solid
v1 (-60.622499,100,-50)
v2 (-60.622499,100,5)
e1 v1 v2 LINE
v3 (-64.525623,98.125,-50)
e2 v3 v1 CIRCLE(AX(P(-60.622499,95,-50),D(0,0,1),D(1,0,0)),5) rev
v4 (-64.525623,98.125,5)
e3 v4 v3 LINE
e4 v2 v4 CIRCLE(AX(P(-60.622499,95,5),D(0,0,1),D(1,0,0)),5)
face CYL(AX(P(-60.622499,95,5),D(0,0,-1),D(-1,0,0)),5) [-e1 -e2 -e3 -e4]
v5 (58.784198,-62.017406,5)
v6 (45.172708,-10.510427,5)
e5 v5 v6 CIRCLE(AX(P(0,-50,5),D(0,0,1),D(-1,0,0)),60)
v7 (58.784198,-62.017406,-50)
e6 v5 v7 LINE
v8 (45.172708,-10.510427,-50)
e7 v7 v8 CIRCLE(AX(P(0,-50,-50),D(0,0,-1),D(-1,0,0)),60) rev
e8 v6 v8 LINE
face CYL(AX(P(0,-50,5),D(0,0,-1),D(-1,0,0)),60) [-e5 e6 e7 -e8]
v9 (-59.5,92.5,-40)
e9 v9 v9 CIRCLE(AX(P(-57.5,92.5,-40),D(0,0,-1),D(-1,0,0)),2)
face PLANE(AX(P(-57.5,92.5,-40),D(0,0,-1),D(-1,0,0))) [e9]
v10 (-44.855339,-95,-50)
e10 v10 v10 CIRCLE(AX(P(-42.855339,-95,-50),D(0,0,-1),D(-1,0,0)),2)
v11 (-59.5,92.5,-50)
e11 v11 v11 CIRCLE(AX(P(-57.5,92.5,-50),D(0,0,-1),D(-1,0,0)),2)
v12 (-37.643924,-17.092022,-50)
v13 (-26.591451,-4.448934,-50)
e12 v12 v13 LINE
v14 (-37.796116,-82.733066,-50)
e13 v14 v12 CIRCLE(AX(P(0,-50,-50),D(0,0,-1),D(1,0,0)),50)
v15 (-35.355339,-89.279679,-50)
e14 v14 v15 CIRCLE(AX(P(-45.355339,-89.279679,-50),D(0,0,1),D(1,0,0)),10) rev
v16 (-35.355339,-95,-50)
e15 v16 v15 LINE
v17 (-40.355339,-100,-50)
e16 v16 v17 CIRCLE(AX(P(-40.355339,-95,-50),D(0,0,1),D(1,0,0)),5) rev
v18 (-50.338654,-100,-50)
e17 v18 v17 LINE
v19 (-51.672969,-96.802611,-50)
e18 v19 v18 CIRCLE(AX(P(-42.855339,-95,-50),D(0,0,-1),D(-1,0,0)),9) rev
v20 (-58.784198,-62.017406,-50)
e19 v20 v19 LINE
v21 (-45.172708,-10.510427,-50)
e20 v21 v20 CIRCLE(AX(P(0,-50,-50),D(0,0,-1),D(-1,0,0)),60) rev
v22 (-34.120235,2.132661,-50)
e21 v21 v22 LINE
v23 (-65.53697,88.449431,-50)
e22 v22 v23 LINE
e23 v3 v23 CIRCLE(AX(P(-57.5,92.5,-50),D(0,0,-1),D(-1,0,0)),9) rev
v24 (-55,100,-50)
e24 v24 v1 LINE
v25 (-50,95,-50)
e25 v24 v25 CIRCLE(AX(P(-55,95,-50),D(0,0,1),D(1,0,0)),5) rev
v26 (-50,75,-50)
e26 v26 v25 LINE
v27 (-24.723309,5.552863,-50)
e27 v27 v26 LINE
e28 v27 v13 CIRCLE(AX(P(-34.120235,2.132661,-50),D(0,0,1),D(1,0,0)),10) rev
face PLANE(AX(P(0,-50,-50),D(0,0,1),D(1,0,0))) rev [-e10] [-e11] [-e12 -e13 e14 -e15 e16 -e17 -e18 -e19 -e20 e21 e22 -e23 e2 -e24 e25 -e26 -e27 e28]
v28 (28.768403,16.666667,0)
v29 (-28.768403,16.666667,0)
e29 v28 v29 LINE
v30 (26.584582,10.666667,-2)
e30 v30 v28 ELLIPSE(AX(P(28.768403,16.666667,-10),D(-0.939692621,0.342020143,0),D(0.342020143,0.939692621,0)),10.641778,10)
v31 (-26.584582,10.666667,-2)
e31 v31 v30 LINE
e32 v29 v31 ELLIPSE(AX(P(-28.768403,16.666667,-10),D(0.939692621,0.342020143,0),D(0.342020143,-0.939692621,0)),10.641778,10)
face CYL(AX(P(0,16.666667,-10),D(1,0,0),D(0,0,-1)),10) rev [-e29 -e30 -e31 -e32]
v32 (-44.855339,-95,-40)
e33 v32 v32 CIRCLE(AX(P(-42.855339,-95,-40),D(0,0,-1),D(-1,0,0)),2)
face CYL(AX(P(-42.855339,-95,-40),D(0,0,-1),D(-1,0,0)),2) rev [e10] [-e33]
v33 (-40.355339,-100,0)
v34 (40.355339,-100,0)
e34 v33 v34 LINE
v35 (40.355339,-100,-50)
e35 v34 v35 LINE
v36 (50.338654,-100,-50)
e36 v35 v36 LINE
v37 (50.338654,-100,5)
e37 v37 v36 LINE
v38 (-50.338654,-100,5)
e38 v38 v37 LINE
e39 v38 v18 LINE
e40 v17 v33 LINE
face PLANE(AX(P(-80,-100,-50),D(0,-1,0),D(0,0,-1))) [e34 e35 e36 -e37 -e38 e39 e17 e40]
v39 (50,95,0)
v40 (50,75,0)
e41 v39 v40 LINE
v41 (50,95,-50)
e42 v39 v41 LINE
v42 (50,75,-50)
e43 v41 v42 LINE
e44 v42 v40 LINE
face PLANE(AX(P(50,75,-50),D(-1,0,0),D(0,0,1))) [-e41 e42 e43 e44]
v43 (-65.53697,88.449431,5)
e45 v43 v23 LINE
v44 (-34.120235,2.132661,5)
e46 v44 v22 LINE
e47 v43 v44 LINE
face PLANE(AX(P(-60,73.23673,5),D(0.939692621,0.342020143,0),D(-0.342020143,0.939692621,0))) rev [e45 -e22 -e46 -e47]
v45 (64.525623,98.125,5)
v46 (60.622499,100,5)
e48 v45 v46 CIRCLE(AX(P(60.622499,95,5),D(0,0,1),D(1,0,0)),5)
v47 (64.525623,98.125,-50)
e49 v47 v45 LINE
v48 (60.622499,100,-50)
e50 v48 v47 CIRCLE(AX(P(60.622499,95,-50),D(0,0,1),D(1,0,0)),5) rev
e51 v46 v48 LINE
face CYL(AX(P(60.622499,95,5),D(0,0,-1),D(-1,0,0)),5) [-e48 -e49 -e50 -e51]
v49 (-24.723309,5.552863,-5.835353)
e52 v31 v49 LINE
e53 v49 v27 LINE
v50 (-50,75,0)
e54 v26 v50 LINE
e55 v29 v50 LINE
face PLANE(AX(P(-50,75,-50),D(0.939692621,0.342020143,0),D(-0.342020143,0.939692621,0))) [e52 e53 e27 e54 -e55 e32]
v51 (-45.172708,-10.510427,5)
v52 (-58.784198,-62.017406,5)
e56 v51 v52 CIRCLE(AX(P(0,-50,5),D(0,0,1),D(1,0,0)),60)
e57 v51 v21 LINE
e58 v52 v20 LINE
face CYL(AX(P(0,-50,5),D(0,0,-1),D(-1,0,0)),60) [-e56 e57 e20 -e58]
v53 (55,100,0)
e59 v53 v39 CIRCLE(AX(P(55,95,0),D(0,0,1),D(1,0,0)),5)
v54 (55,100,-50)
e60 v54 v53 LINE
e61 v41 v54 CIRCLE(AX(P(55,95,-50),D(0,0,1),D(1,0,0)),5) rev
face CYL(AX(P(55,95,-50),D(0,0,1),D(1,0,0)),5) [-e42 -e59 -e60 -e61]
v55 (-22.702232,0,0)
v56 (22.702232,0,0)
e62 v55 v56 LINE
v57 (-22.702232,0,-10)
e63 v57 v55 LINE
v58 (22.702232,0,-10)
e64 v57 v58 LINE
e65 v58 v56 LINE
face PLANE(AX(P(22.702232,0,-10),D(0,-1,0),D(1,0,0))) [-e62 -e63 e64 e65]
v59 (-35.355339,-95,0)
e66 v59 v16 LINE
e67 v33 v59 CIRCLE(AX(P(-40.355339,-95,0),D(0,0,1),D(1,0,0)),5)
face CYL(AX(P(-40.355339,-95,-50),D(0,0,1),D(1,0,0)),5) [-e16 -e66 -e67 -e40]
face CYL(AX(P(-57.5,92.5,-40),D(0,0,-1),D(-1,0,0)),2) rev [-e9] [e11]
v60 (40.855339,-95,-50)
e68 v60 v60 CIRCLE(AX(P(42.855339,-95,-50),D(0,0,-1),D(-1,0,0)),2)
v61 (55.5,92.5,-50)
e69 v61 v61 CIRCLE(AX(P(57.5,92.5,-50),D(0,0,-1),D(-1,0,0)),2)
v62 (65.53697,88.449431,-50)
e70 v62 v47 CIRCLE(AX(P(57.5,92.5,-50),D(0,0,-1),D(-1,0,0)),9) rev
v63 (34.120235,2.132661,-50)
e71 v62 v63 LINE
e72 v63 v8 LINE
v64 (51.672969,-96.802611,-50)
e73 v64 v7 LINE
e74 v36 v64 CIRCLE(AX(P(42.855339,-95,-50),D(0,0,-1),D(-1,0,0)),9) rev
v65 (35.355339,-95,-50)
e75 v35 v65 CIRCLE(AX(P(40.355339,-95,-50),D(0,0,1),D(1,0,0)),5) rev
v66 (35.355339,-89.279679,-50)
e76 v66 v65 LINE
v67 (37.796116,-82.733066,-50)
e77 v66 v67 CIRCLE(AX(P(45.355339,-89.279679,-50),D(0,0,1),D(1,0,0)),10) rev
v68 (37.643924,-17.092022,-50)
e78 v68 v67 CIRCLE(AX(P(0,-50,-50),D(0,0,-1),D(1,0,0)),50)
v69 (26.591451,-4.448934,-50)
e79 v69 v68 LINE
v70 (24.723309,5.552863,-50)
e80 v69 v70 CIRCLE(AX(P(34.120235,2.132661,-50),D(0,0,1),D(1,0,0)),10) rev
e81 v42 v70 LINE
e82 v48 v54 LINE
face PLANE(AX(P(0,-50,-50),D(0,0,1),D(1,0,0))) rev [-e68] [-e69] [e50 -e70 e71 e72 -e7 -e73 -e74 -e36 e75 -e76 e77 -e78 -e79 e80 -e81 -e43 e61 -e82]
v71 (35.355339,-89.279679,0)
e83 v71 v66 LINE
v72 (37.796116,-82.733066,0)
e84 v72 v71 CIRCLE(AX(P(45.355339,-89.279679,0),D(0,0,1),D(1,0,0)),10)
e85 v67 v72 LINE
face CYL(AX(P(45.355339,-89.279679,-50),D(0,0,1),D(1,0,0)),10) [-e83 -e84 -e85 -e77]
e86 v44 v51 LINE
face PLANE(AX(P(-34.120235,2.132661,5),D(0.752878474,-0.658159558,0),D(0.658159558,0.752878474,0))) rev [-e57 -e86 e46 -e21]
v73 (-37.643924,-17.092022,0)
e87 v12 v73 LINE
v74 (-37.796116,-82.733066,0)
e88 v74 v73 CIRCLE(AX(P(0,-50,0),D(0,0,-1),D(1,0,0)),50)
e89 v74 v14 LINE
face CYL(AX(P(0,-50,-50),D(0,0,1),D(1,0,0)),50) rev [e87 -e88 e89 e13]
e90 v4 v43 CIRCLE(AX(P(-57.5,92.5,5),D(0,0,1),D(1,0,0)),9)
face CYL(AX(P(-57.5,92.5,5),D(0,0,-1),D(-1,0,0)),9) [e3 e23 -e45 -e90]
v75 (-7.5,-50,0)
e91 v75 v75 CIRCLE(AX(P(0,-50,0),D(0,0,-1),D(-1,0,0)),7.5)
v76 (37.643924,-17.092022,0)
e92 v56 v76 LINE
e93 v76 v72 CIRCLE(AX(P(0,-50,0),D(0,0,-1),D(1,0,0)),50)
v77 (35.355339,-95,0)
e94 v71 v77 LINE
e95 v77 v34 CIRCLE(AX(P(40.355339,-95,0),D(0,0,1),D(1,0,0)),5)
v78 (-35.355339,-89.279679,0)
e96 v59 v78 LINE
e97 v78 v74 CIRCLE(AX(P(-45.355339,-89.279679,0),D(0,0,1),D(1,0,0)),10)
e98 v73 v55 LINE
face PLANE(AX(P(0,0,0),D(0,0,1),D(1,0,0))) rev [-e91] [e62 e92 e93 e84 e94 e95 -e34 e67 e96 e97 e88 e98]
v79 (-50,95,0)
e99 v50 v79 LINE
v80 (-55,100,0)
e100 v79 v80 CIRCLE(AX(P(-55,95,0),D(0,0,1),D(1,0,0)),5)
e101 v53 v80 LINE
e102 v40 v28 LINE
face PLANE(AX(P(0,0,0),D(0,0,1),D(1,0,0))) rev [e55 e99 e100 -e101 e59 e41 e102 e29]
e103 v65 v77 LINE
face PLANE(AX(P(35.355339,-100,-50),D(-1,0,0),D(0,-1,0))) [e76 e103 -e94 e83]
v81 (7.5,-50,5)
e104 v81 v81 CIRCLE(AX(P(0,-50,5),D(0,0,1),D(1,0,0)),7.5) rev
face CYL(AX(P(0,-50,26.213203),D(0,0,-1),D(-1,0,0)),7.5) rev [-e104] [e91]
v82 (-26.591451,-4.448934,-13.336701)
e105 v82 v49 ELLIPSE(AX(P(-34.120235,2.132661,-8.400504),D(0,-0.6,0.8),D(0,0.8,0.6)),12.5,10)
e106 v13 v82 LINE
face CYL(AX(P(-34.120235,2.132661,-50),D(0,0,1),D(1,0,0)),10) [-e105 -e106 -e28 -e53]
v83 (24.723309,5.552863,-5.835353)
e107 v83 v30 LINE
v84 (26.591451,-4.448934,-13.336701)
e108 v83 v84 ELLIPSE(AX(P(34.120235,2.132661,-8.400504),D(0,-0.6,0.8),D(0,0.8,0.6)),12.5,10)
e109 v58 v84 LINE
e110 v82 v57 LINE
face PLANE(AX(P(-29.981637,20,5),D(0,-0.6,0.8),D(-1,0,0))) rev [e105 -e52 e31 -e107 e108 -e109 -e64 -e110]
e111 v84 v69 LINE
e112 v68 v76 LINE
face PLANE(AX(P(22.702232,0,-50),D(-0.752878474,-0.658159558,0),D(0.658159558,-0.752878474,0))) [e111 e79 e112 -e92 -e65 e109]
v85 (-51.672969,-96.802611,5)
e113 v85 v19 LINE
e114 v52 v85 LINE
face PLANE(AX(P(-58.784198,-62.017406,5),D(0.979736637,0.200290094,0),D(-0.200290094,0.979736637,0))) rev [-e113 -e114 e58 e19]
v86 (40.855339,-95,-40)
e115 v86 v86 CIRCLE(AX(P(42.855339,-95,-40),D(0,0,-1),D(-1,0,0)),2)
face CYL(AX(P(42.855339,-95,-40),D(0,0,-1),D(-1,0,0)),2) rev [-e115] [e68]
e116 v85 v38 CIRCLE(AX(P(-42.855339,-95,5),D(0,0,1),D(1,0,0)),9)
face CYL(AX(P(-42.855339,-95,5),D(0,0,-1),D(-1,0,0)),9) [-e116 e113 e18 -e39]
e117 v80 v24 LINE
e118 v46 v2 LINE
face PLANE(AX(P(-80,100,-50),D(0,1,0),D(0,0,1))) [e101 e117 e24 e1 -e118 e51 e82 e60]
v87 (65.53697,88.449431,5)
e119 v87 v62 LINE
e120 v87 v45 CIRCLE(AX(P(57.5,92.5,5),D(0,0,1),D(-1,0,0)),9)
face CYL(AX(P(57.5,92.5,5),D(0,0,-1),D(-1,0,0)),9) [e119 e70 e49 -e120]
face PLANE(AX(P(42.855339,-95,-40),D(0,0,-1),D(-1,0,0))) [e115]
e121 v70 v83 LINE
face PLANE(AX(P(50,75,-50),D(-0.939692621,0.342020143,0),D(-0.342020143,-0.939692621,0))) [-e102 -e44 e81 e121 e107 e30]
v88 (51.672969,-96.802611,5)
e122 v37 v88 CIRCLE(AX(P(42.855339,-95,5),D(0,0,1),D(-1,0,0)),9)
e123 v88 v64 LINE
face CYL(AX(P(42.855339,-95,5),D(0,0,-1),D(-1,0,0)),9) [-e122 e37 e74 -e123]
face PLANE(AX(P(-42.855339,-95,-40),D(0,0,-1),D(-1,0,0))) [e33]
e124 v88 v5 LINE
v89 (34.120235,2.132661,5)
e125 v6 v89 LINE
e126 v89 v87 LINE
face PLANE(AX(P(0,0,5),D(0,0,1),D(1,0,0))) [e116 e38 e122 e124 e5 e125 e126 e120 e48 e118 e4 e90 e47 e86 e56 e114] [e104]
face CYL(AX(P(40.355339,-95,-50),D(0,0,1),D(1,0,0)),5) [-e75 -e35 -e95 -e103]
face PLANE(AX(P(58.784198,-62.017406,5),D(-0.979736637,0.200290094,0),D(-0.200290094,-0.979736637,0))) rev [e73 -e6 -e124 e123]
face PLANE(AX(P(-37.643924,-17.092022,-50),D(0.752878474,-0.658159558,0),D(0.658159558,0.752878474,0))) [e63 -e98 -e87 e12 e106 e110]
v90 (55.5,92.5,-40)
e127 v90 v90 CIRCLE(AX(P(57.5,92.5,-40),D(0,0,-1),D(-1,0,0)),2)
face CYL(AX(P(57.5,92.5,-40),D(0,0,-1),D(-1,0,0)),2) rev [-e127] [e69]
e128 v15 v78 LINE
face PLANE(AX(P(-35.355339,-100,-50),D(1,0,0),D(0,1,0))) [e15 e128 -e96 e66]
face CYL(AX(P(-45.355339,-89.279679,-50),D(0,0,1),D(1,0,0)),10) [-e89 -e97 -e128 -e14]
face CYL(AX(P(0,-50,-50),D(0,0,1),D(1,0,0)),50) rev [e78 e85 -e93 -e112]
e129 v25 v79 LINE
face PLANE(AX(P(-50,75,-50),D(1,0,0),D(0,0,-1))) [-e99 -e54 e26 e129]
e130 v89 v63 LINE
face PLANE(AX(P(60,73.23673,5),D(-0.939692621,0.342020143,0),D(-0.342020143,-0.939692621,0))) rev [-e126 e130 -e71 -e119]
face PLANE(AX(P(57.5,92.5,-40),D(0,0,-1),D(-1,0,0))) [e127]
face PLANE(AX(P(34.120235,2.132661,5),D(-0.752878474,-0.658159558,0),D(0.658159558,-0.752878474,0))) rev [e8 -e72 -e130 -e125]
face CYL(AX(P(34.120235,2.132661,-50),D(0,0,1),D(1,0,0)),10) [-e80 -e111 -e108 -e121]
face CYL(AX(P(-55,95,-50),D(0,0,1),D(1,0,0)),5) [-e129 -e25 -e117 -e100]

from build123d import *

# Parameters (mm, degrees)
BOSS_EXTRUDE1_DEPTH     = 50
BOSS_EXTRUDE1_2_DEPTH   = 50
BOSS_EXTRUDE2_DEPTH     = 10
CHAMFER1_SIZE           = 15
CHAMFER1_SIZE_2         = 20
SKETCH4_W               = 160
SKETCH4_H               = 200
BOSS_EXTRUDE3_DEPTH     = 5
FILLET1_R               = 10
SKETCH5_R               = 7.5
CUT_EXTRUDE1_DEPTH      = 5
CUT_EXTRUDE5_DEPTH      = 140.373598648
CUT_EXTRUDE5_DEPTH_BACK = 140.373598648
FILLET4_R               = 5
SKETCH12_R              = 2
CUT_EXTRUDE6_DEPTH      = 10


with BuildPart() as part:
    # Sketch2 → Boss-Extrude1 (new body)
    with BuildSketch(Plane.XY):
        with BuildLine():
            Line((-50, 75), (-22.70223243, 0))
            Line((-22.70223243, 0), (-37.64392369, -17.092022104))
            ThreePointArc((-37.64392369, -17.092022104), (-49.971924127, -51.675350432), (-35.355339059, -85.355339059))
            Line((-35.355339059, -85.355339059), (-35.355339059, -100))
            Line((-35.355339059, -100), (-80, -100))
            Line((-80, -100), (-80, 100))
            Line((-80, 100), (-50, 100))
            Line((-50, 100), (-50, 75))
        make_face()
    extrude(amount=-BOSS_EXTRUDE1_DEPTH)



with BuildPart() as body_2:
    # Sketch2 → Boss-Extrude1 2 (new body)
    with BuildSketch(Plane.XY):
        with BuildLine():
            Line((50, 75), (22.70223243, 0))
            Line((22.70223243, 0), (37.64392369, -17.092022104))
            ThreePointArc((37.64392369, -17.092022104), (49.971924127, -51.675350432), (35.355339059, -85.355339059))
            Line((35.355339059, -85.355339059), (35.355339059, -100))
            Line((35.355339059, -100), (80, -100))
            Line((80, -100), (80, 100))
            Line((80, 100), (50, 100))
            Line((50, 100), (50, 75))
        make_face()
    extrude(amount=-BOSS_EXTRUDE1_2_DEPTH)


with BuildPart() as part_1:
    add(part.part)

    add(body_2.part)  # Boss-Extrude2 merges body 2
    # Sketch3 → Boss-Extrude2 (add)
    with BuildSketch(Plane.XY):
        Polygon((-29.981637115, 20), (29.981637115, 20), (22.70223243, 0), (-22.70223243, 0), align=None)
    extrude(amount=-BOSS_EXTRUDE2_DEPTH)

    # Chamfer1
    # the kernel refuses this chamfer: 20, 15 mm, written as the material it takes off along each edge
    with BuildSketch(Plane(origin=(-81.595588718, 20, -10), x_dir=(0, 0.041308380137954244, 0.9991464445867674), z_dir=(1, 0, 0))) as chamfer1_piece_1_section:
        Polygon((CHAMFER1_SIZE * 0.999146444587, CHAMFER1_SIZE * 0.041308380138), (-CHAMFER1_SIZE_2 * 0.041308380138, CHAMFER1_SIZE_2 * 0.999146444587), (0, 0), align=None)
    chamfer1_piece_1 = extrude(amount=163.191177435, mode=Mode.PRIVATE)
    chamfer1_piece_1 = split(chamfer1_piece_1, bisect_by=Plane(origin=(-24.447399798, 4.794807938, -4.975922198), z_dir=(0.9396926207859094, 0.3420201433256661, 0)), keep=Keep.TOP, mode=Mode.PRIVATE)
    chamfer1_piece_1 = split(chamfer1_piece_1, bisect_by=Plane(origin=(24.447399798, 4.794807938, -4.975922198), z_dir=(-0.939692620785907, 0.34202014332567265, 0)), keep=Keep.TOP, mode=Mode.PRIVATE)
    add(chamfer1_piece_1, mode=Mode.SUBTRACT)

    # Sketch4 → Boss-Extrude3 (add)
    with BuildSketch(Plane.XY):
        Rectangle(SKETCH4_W, SKETCH4_H)
    extrude(amount=BOSS_EXTRUDE3_DEPTH)

    # Fillet1
    fillet1_edges = [part_1.edges().sort_by_distance(p)[0] for p in [
        (-22.70223243, 0, -30),
        (-35.355339059, -85.355339059, -25),
        (35.355339059, -85.355339059, -25),
        (22.70223243, 0, -30),
        (0, 13.333333333, 0),
    ]]
    fillet(fillet1_edges, radius=FILLET1_R)

    # Sketch5 → Cut-Extrude1 (cut)
    with BuildSketch(Plane(origin=(0, 0, 0), x_dir=(-1, 0, 0), z_dir=(0, 0, -1))):
        with Locations((0, -50)):
            Circle(SKETCH5_R)
    extrude(amount=-CUT_EXTRUDE1_DEPTH, mode=Mode.SUBTRACT)

    # Sketch11 → Cut-Extrude5 (cut, two sides: drawn at the far end of the back side and taken through both)
    with BuildSketch(Plane(origin=(0, 0, -50), x_dir=(-1, 0, 0), z_dir=(0, 0, -1)).offset(-CUT_EXTRUDE5_DEPTH_BACK)):
        with BuildLine():
            Line((-58.784198233, -62.017405631), (-51.672968794, -96.802610845))
            ThreePointArc((-51.672968794, -96.802610845), (-51.161121522, -98.466118532), (-50.338653833, -100))
            Line((-50.338653833, -100), (-80, -100))
            Line((-80, -100), (-80, 100))
            Line((-80, 100), (-62.474937186, 100))
            ThreePointArc((-62.474937186, 100), (-66.199502533, 94.806221081), (-65.536970349, 88.4494312))
            Line((-65.536970349, 88.4494312), (-60, 73.236730193))
            Line((-60, 73.236730193), (-34.120235365, 2.132661237))
            Line((-34.120235365, 2.132661237), (-45.172708428, -10.510426525))
            ThreePointArc((-45.172708428, -10.510426525), (-58.008635864, -34.670350128), (-58.784198233, -62.017405631))
        make_face()
        with BuildLine():
            Line((34.120235365, 2.132661237), (45.172708428, -10.510426525))
            ThreePointArc((45.172708428, -10.510426525), (58.008635864, -34.670350128), (58.784198233, -62.017405631))
            Line((58.784198233, -62.017405631), (51.672968794, -96.802610845))
            ThreePointArc((51.672968794, -96.802610845), (51.161121522, -98.466118532), (50.338653833, -100))
            Line((50.338653833, -100), (80, -100))
            Line((80, -100), (80, 100))
            Line((80, 100), (62.474937186, 100))
            ThreePointArc((62.474937186, 100), (66.199502533, 94.806221081), (65.536970349, 88.4494312))
            Line((65.536970349, 88.4494312), (60, 73.236730193))
            Line((60, 73.236730193), (34.120235365, 2.132661237))
        make_face()
    extrude(amount=CUT_EXTRUDE5_DEPTH + CUT_EXTRUDE5_DEPTH_BACK, mode=Mode.SUBTRACT)

    # Fillet4
    fillet4_edges = [part_1.edges().sort_by_distance(p)[0] for p in [
        (-35.355339059, -100, -25),
        (-50, 100, -25),
        (62.474937186, 100, -22.5),
        (-62.474937186, 100, -22.5),
        (50, 100, -25),
        (35.355339059, -100, -25),
    ]]
    fillet(fillet4_edges, radius=FILLET4_R)

    # Sketch12 → Cut-Extrude6 (cut)
    with BuildSketch(Plane(origin=(0, 0, -50), x_dir=(-1, 0, 0), z_dir=(0, 0, -1))):
        with Locations((-57.5, 92.5)):
            Circle(SKETCH12_R)
        with Locations((57.5, 92.5)):
            Circle(SKETCH12_R)
        with Locations((-42.855339059, -95)):
            Circle(SKETCH12_R)
        with Locations((42.855339059, -95)):
            Circle(SKETCH12_R)
    extrude(amount=-CUT_EXTRUDE6_DEPTH, mode=Mode.SUBTRACT)


solid = part_1.part
